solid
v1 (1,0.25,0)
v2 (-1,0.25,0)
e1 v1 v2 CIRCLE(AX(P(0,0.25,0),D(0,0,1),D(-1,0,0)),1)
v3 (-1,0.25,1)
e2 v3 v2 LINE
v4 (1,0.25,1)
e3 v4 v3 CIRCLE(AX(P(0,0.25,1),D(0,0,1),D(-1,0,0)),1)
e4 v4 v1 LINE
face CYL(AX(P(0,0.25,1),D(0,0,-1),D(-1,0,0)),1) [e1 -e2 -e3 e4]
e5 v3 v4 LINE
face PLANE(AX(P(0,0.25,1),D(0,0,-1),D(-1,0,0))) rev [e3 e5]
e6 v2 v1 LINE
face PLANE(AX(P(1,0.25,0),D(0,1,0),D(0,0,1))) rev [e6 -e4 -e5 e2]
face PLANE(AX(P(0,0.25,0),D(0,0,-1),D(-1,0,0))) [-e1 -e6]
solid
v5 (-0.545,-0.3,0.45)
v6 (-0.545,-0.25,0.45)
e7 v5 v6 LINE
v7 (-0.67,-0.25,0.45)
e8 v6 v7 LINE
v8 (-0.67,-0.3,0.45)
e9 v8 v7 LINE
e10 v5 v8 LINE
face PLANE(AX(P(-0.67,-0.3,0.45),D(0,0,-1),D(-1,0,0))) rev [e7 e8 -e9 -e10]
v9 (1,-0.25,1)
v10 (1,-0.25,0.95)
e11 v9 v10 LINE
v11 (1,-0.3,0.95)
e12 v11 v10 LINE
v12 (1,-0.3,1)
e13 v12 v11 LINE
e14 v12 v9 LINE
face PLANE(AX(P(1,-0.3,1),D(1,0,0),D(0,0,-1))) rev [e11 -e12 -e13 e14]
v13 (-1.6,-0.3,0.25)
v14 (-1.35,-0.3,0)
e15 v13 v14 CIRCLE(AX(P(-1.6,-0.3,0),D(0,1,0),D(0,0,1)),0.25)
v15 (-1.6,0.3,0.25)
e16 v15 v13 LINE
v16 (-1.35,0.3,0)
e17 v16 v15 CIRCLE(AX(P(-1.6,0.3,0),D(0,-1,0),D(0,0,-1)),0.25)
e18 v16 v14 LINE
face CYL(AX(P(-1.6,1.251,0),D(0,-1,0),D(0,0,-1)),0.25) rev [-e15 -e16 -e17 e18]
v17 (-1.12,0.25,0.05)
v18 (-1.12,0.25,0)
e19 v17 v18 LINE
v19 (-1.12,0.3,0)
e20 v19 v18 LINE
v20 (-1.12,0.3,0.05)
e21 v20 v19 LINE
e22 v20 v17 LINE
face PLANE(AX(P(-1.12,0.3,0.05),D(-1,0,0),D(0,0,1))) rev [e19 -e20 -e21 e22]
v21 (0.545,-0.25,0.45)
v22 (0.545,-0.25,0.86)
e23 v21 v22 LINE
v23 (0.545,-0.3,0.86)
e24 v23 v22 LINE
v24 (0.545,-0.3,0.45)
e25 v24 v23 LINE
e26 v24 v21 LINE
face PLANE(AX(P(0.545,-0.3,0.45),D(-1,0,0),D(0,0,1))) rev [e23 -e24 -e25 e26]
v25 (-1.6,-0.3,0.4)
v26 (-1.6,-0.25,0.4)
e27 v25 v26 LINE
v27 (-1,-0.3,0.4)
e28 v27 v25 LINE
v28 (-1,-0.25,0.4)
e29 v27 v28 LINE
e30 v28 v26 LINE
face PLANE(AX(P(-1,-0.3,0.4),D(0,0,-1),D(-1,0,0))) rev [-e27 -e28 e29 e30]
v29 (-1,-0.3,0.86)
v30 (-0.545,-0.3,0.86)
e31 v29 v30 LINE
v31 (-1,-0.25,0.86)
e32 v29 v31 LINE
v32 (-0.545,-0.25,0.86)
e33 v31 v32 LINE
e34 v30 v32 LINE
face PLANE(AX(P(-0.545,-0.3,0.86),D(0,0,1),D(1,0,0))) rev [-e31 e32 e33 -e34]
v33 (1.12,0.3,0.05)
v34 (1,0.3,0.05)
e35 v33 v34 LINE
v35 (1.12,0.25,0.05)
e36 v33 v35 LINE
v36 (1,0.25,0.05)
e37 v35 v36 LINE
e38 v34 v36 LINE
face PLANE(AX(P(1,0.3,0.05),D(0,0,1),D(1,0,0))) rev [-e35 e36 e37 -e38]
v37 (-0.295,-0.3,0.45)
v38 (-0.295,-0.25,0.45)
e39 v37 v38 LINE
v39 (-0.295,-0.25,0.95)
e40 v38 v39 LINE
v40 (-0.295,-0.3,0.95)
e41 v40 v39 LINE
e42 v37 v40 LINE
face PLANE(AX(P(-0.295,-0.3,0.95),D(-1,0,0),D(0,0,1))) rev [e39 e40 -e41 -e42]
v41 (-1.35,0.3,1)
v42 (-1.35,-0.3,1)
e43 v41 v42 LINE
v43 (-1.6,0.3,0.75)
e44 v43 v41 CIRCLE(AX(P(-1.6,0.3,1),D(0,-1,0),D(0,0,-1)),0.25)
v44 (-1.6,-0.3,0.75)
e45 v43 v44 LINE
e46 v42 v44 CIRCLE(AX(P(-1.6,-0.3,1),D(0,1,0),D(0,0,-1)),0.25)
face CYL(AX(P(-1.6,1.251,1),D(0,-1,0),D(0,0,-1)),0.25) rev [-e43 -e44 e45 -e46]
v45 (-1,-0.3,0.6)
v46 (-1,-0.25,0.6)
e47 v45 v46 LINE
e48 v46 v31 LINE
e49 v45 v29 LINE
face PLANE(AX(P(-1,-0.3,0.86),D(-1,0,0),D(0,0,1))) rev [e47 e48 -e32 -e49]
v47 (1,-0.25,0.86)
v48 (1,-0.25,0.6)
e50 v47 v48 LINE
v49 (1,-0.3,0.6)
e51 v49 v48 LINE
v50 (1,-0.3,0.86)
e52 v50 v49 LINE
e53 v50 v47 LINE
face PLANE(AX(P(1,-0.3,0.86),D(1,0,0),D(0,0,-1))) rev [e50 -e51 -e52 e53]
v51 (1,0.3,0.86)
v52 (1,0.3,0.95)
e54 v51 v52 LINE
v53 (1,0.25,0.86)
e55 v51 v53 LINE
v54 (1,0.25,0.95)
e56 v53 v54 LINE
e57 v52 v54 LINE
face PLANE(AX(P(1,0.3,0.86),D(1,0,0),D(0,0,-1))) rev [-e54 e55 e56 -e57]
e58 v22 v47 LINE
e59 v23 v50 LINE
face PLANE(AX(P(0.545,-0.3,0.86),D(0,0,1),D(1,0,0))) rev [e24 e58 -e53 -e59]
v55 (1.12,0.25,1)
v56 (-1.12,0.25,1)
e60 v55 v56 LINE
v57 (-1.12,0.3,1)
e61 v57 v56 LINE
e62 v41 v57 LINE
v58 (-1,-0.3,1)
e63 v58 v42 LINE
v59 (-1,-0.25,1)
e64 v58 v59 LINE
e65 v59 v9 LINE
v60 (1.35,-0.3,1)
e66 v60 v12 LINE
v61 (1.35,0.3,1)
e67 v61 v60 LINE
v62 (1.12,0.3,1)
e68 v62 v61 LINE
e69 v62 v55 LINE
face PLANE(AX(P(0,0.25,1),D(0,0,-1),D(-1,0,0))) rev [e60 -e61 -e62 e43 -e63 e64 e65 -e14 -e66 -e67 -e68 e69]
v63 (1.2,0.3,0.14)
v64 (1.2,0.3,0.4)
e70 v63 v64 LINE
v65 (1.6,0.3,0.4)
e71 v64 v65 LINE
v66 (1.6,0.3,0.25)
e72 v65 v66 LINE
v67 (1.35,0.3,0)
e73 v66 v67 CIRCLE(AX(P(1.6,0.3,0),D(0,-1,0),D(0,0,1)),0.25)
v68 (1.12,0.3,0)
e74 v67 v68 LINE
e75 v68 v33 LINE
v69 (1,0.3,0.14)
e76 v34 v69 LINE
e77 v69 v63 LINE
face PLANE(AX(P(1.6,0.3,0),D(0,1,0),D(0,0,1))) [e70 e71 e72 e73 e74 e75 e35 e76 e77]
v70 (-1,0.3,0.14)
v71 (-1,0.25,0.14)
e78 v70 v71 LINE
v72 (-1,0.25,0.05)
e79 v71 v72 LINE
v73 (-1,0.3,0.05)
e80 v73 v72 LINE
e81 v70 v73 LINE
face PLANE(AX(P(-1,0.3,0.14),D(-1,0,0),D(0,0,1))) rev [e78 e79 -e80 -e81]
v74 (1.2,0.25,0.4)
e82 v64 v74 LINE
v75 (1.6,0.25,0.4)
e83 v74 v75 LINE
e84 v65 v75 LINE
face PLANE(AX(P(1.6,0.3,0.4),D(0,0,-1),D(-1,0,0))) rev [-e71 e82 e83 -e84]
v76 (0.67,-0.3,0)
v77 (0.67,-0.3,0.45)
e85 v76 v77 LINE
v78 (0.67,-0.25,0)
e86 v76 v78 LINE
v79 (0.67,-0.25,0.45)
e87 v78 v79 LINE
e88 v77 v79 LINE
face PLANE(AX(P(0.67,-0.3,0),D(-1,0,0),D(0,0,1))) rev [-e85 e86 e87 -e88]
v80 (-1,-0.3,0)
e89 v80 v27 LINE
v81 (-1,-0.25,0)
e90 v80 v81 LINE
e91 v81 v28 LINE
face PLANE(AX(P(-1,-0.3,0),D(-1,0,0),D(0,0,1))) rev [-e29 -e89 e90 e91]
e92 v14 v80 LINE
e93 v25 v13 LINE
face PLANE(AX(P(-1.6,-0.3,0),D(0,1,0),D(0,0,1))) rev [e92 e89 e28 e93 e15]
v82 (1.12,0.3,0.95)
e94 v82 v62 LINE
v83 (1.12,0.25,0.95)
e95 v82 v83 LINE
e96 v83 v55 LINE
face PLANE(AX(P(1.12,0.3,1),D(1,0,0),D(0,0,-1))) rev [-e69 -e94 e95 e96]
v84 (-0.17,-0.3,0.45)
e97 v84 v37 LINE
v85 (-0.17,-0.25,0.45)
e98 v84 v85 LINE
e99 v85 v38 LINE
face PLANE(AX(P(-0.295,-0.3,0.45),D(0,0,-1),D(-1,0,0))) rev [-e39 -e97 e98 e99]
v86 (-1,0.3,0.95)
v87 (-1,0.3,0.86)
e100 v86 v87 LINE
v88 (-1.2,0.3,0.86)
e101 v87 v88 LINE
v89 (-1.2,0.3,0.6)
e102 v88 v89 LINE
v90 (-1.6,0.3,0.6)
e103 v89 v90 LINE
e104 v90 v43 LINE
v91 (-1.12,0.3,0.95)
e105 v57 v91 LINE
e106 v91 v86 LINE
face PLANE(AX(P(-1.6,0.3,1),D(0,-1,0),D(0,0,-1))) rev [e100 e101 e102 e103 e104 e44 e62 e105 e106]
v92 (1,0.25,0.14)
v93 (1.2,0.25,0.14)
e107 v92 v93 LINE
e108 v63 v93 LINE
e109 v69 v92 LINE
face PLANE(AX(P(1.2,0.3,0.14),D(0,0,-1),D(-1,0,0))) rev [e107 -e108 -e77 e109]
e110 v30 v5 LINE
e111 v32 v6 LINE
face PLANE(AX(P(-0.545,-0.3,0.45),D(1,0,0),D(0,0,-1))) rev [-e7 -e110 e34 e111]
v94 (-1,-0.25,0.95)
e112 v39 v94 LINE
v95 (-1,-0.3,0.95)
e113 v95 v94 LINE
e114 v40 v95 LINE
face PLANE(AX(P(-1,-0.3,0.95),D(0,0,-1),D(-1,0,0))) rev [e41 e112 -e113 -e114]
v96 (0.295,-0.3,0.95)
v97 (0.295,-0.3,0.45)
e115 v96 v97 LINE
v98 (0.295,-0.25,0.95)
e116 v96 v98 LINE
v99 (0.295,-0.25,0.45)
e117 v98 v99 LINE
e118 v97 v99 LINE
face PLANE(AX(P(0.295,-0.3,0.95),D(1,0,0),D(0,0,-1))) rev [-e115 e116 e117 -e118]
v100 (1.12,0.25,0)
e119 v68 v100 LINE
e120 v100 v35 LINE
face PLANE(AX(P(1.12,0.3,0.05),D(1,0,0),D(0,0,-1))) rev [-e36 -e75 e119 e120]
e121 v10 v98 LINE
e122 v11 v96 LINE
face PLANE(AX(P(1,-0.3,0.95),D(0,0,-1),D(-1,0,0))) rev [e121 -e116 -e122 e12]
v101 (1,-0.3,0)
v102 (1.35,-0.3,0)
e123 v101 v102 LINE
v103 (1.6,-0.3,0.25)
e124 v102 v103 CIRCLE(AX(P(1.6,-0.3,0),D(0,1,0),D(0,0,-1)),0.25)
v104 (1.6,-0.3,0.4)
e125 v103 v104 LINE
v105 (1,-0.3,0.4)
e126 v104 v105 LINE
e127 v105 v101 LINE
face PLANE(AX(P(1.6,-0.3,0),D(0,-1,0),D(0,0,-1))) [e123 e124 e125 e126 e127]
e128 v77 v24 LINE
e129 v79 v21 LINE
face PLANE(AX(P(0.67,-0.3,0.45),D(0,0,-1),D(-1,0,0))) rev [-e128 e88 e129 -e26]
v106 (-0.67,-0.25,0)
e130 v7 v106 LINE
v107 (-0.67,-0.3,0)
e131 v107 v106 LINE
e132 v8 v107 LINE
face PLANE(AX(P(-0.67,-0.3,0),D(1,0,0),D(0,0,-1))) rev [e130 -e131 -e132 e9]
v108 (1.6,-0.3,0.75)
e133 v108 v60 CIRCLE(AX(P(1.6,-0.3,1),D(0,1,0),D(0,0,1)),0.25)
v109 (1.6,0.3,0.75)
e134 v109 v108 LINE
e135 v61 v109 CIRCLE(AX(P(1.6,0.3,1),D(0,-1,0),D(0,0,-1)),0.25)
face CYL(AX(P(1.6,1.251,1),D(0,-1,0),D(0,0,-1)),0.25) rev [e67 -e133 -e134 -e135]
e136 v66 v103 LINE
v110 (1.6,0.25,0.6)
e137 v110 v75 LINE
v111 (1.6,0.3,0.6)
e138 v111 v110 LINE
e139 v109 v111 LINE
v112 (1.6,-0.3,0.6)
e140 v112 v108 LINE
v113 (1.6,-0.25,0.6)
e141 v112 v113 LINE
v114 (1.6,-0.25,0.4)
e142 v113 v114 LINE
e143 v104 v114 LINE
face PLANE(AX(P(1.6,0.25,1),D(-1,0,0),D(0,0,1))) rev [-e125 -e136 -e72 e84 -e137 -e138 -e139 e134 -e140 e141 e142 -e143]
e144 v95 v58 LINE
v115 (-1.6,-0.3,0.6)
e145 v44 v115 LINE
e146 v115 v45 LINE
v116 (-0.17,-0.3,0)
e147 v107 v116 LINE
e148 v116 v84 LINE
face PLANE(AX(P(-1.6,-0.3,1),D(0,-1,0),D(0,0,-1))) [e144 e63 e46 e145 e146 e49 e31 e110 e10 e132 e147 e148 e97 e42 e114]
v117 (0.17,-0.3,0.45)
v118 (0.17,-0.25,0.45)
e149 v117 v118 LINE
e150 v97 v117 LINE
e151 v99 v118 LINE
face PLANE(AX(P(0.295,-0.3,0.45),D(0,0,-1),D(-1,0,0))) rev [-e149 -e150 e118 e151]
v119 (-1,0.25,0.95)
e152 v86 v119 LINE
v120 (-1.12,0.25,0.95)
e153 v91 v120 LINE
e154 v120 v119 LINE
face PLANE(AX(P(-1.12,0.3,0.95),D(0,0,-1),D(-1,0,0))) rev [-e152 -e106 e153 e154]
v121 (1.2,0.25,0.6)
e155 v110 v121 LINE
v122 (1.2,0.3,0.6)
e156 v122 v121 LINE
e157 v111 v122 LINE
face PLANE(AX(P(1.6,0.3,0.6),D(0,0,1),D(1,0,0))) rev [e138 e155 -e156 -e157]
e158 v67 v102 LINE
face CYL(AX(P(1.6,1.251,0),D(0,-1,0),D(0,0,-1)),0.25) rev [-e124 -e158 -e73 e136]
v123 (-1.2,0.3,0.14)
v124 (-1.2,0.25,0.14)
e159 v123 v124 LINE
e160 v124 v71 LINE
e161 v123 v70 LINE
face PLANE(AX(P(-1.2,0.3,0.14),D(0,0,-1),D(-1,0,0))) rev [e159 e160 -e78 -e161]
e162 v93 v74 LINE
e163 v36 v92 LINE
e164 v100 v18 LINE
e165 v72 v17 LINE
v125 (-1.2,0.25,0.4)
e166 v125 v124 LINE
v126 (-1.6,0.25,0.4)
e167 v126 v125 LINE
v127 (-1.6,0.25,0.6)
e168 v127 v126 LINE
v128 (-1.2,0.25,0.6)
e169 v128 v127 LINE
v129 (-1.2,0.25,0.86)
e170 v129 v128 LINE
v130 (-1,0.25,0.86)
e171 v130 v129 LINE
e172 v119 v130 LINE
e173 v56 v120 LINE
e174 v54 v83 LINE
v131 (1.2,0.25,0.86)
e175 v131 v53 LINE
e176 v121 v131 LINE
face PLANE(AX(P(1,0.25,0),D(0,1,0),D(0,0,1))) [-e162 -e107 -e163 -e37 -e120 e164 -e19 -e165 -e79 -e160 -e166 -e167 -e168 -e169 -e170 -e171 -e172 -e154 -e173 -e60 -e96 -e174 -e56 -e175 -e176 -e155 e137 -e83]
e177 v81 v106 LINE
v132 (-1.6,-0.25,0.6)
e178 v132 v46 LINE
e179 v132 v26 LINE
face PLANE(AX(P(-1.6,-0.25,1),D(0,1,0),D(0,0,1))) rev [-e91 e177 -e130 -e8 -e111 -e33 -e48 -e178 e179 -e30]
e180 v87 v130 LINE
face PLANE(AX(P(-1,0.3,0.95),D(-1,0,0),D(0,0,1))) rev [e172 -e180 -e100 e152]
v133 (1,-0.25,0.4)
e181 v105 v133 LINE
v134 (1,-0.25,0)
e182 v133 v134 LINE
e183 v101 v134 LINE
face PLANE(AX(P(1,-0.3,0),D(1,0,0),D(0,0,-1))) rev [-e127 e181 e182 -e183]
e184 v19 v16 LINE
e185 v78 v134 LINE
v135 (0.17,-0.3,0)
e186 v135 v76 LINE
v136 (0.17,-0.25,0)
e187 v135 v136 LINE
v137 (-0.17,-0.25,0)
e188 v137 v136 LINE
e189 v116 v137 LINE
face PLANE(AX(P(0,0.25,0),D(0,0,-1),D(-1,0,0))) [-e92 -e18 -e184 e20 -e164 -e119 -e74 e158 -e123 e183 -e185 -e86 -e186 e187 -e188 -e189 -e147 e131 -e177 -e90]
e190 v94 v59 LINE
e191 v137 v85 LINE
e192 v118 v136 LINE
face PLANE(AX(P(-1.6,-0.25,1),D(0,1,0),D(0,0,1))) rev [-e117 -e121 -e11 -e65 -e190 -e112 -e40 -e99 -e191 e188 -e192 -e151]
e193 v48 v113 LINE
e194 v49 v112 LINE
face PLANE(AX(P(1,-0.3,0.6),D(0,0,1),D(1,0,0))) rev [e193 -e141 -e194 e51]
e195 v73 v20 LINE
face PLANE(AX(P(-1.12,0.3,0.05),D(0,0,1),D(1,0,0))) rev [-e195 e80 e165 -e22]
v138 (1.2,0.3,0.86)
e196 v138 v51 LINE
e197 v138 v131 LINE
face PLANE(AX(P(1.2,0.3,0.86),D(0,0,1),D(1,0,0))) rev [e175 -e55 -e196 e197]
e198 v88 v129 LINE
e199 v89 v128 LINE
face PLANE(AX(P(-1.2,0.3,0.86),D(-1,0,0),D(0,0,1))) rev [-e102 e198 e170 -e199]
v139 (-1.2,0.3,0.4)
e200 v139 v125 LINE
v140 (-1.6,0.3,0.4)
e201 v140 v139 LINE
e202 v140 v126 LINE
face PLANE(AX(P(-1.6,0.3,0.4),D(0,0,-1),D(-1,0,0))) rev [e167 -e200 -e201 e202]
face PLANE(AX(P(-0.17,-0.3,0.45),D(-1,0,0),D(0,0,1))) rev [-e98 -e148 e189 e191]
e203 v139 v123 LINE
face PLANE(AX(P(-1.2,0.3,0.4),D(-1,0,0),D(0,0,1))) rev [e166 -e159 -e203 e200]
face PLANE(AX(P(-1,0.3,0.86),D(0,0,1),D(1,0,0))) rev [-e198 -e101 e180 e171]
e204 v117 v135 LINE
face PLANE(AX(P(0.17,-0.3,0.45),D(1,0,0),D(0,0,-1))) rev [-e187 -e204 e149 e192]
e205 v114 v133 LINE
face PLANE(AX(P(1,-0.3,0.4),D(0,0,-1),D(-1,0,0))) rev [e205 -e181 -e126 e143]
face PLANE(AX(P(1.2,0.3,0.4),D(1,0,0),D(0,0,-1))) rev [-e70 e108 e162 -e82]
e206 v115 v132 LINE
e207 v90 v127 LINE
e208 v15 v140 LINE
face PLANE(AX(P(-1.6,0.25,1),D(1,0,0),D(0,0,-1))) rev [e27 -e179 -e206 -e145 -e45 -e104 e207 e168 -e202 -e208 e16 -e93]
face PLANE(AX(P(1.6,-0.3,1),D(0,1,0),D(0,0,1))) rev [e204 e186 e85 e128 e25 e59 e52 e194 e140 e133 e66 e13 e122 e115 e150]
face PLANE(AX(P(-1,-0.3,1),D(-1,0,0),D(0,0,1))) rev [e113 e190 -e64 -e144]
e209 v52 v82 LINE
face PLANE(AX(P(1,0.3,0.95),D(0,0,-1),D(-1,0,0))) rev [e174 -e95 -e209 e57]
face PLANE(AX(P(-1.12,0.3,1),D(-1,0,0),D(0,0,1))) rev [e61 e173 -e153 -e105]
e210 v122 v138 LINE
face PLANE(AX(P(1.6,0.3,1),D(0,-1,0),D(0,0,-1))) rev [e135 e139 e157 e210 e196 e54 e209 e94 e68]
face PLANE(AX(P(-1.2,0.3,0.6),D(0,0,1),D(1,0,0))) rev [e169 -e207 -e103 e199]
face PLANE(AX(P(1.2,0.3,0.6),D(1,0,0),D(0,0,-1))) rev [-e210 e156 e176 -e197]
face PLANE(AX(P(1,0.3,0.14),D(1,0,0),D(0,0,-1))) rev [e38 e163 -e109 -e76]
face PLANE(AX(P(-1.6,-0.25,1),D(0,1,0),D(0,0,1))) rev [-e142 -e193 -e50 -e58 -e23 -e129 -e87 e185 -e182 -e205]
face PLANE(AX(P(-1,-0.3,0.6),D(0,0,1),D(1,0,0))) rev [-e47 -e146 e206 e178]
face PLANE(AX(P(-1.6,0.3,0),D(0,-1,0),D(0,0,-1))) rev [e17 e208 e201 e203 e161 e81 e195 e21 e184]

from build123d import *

# Parameters (mm, degrees)
EXTRUDE_1_DEPTH     = 1
CUT_EXTRUDE_1_DEPTH = 0.5
EXTRUDE_2_DEPTH     = 0.05
EXTRUDE_4_DEPTH     = 0.05


# Read off the part's stored shape, not the designer's step: Разделить1
with BuildPart() as part:
    # Эскиз1 → Бобышка-Вытянуть1 (new body)
    with BuildSketch(Plane.XY):
        with BuildLine():
            Line((-1.6, 0.25), (-1, 0.25))
            ThreePointArc((-1, 0.25), (0, 1.25), (1, 0.25))
            Line((1, 0.25), (1.6, 0.25))
            Line((1.6, 0.25), (1.6, -0.25))
            Line((1.6, -0.25), (-1.6, -0.25))
            Line((-1.6, -0.25), (-1.6, 0.25))
        make_face()
    extrude(amount=EXTRUDE_1_DEPTH)


with BuildPart() as body_2:
    # Split Bodies 1: the piece on the far side of the plane
    add(part.part)
    split(bisect_by=Plane(origin=(0, 0.25, 0), x_dir=(1, 0, 0), z_dir=(0, 1, 0)), keep=Keep.BOTTOM)

    # Эскиз2 → Вырез-Вытянуть1 (cut)
    with BuildSketch(Plane.XZ.offset(0.25)):
        with BuildLine():
            Line((-1.35, 0), (-1.6, 0))
            Line((-1.6, 0), (-1.6, 0.25))
            ThreePointArc((-1.6, 0.25), (-1.423223305, 0.176776695), (-1.35, 0))
        make_face()
        with BuildLine():
            Line((-1.35, 1), (-1.6, 1))
            Line((-1.6, 1), (-1.6, 0.75))
            ThreePointArc((-1.6, 0.75), (-1.423223305, 0.823223305), (-1.35, 1))
        make_face()
        with BuildLine():
            Line((1.6, 0.75), (1.6, 1))
            Line((1.6, 1), (1.35, 1))
            ThreePointArc((1.35, 1), (1.423223305, 0.823223305), (1.6, 0.75))
        make_face()
        with BuildLine():
            Line((1.6, 0.25), (1.6, 0))
            Line((1.6, 0), (1.35, 0))
            ThreePointArc((1.35, 0), (1.423223305, 0.176776695), (1.6, 0.25))
        make_face()
    extrude(amount=-CUT_EXTRUDE_1_DEPTH, mode=Mode.SUBTRACT)

    # Эскиз3 → Бобышка-Вытянуть2 (add)
    with BuildSketch(Plane.XZ.offset(0.25)):
        with BuildLine():
            Line((-1, 0), (-1, 0.4))
            Line((-1, 0.4), (-1.6, 0.4))
            Line((-1.6, 0.4), (-1.6, 0.25))
            ThreePointArc((-1.6, 0.25), (-1.423223305, 0.176776695), (-1.35, 0))
            Line((-1.35, 0), (-1, 0))
        make_face()
        with BuildLine():
            Line((1, 0), (1, 0.4))
            Line((1, 0.4), (1.6, 0.4))
            Line((1.6, 0.4), (1.6, 0.25))
            ThreePointArc((1.6, 0.25), (1.423223305, 0.176776695), (1.35, 0))
            Line((1.35, 0), (1, 0))
        make_face()
        with BuildLine():
            Line((1, 1), (1, 0.95))
            Line((1, 0.95), (0.295, 0.95))
            Line((0.295, 0.95), (0.295, 0.45))
            Line((0.295, 0.45), (0.17, 0.45))
            Line((0.17, 0.45), (0.17, 0))
            Line((0.17, 0), (0.67, 0))
            Line((0.67, 0), (0.67, 0.45))
            Line((0.67, 0.45), (0.545, 0.45))
            Line((0.545, 0.45), (0.545, 0.86))
            Line((0.545, 0.86), (1, 0.86))
            Line((1, 0.86), (1, 0.6))
            Line((1, 0.6), (1.6, 0.6))
            Line((1.6, 0.6), (1.6, 0.75))
            ThreePointArc((1.6, 0.75), (1.423223305, 0.823223305), (1.35, 1))
            Line((1.35, 1), (1, 1))
        make_face()
        with BuildLine():
            Line((-1.35, 1), (-1, 1))
            Line((-1, 1), (-1, 0.95))
            Line((-1, 0.95), (-0.295, 0.95))
            Line((-0.295, 0.95), (-0.295, 0.45))
            Line((-0.295, 0.45), (-0.17, 0.45))
            Line((-0.17, 0.45), (-0.17, 0))
            Line((-0.17, 0), (-0.67, 0))
            Line((-0.67, 0), (-0.67, 0.45))
            Line((-0.67, 0.45), (-0.545, 0.45))
            Line((-0.545, 0.45), (-0.545, 0.86))
            Line((-0.545, 0.86), (-1, 0.86))
            Line((-1, 0.86), (-1, 0.6))
            Line((-1, 0.6), (-1.6, 0.6))
            Line((-1.6, 0.6), (-1.6, 0.75))
            ThreePointArc((-1.6, 0.75), (-1.423223305, 0.823223305), (-1.35, 1))
        make_face()
    extrude(amount=EXTRUDE_2_DEPTH)

    # Эскиз4 → Бобышка-Вытянуть4 (add)
    with BuildSketch(Plane(origin=(0, 0.25, 0), x_dir=(1, 0, 0), z_dir=(0, 1, 0))):
        with BuildLine():
            Line((1.6, -0.4), (1.2, -0.4))
            Line((1.2, -0.4), (1.2, -0.14))
            Line((1.2, -0.14), (1, -0.14))
            Line((1, -0.14), (1, -0.05))
            Line((1, -0.05), (1.12, -0.05))
            Line((1.12, -0.05), (1.12, 0))
            Line((1.12, 0), (1.35, 0))
            ThreePointArc((1.35, 0), (1.423223305, -0.176776695), (1.6, -0.25))
            Line((1.6, -0.25), (1.6, -0.4))
        make_face()
        with BuildLine():
            Line((1.6, -0.6), (1.2, -0.6))
            Line((1.2, -0.6), (1.2, -0.86))
            Line((1.2, -0.86), (1, -0.86))
            Line((1, -0.86), (1, -0.95))
            Line((1, -0.95), (1.12, -0.95))
            Line((1.12, -0.95), (1.12, -1))
            Line((1.12, -1), (1.35, -1))
            ThreePointArc((1.35, -1), (1.423223305, -0.823223305), (1.6, -0.75))
            Line((1.6, -0.75), (1.6, -0.6))
        make_face()
        with BuildLine():
            Line((-1.6, -0.25), (-1.6, -0.4))
            Line((-1.6, -0.4), (-1.2, -0.4))
            Line((-1.2, -0.4), (-1.2, -0.14))
            Line((-1.2, -0.14), (-1, -0.14))
            Line((-1, -0.14), (-1, -0.05))
            Line((-1, -0.05), (-1.12, -0.05))
            Line((-1.12, -0.05), (-1.12, 0))
            Line((-1.12, 0), (-1.35, 0))
            ThreePointArc((-1.35, 0), (-1.423223305, -0.176776695), (-1.6, -0.25))
        make_face()
        with BuildLine():
            Line((-1.35, -1), (-1.12, -1))
            Line((-1.12, -1), (-1.12, -0.95))
            Line((-1.12, -0.95), (-1, -0.95))
            Line((-1, -0.95), (-1, -0.86))
            Line((-1, -0.86), (-1.2, -0.86))
            Line((-1.2, -0.86), (-1.2, -0.6))
            Line((-1.2, -0.6), (-1.6, -0.6))
            Line((-1.6, -0.6), (-1.6, -0.75))
            ThreePointArc((-1.6, -0.75), (-1.423223305, -0.823223305), (-1.35, -1))
        make_face()
    extrude(amount=EXTRUDE_4_DEPTH)


with BuildPart() as part_1:
    add(part.part)

    # Split Bodies 1
    split(bisect_by=Plane(origin=(0, 0.25, 0), x_dir=(1, 0, 0), z_dir=(0, 1, 0)), keep=Keep.TOP)


solid = Compound([body_2.part, part_1.part])
